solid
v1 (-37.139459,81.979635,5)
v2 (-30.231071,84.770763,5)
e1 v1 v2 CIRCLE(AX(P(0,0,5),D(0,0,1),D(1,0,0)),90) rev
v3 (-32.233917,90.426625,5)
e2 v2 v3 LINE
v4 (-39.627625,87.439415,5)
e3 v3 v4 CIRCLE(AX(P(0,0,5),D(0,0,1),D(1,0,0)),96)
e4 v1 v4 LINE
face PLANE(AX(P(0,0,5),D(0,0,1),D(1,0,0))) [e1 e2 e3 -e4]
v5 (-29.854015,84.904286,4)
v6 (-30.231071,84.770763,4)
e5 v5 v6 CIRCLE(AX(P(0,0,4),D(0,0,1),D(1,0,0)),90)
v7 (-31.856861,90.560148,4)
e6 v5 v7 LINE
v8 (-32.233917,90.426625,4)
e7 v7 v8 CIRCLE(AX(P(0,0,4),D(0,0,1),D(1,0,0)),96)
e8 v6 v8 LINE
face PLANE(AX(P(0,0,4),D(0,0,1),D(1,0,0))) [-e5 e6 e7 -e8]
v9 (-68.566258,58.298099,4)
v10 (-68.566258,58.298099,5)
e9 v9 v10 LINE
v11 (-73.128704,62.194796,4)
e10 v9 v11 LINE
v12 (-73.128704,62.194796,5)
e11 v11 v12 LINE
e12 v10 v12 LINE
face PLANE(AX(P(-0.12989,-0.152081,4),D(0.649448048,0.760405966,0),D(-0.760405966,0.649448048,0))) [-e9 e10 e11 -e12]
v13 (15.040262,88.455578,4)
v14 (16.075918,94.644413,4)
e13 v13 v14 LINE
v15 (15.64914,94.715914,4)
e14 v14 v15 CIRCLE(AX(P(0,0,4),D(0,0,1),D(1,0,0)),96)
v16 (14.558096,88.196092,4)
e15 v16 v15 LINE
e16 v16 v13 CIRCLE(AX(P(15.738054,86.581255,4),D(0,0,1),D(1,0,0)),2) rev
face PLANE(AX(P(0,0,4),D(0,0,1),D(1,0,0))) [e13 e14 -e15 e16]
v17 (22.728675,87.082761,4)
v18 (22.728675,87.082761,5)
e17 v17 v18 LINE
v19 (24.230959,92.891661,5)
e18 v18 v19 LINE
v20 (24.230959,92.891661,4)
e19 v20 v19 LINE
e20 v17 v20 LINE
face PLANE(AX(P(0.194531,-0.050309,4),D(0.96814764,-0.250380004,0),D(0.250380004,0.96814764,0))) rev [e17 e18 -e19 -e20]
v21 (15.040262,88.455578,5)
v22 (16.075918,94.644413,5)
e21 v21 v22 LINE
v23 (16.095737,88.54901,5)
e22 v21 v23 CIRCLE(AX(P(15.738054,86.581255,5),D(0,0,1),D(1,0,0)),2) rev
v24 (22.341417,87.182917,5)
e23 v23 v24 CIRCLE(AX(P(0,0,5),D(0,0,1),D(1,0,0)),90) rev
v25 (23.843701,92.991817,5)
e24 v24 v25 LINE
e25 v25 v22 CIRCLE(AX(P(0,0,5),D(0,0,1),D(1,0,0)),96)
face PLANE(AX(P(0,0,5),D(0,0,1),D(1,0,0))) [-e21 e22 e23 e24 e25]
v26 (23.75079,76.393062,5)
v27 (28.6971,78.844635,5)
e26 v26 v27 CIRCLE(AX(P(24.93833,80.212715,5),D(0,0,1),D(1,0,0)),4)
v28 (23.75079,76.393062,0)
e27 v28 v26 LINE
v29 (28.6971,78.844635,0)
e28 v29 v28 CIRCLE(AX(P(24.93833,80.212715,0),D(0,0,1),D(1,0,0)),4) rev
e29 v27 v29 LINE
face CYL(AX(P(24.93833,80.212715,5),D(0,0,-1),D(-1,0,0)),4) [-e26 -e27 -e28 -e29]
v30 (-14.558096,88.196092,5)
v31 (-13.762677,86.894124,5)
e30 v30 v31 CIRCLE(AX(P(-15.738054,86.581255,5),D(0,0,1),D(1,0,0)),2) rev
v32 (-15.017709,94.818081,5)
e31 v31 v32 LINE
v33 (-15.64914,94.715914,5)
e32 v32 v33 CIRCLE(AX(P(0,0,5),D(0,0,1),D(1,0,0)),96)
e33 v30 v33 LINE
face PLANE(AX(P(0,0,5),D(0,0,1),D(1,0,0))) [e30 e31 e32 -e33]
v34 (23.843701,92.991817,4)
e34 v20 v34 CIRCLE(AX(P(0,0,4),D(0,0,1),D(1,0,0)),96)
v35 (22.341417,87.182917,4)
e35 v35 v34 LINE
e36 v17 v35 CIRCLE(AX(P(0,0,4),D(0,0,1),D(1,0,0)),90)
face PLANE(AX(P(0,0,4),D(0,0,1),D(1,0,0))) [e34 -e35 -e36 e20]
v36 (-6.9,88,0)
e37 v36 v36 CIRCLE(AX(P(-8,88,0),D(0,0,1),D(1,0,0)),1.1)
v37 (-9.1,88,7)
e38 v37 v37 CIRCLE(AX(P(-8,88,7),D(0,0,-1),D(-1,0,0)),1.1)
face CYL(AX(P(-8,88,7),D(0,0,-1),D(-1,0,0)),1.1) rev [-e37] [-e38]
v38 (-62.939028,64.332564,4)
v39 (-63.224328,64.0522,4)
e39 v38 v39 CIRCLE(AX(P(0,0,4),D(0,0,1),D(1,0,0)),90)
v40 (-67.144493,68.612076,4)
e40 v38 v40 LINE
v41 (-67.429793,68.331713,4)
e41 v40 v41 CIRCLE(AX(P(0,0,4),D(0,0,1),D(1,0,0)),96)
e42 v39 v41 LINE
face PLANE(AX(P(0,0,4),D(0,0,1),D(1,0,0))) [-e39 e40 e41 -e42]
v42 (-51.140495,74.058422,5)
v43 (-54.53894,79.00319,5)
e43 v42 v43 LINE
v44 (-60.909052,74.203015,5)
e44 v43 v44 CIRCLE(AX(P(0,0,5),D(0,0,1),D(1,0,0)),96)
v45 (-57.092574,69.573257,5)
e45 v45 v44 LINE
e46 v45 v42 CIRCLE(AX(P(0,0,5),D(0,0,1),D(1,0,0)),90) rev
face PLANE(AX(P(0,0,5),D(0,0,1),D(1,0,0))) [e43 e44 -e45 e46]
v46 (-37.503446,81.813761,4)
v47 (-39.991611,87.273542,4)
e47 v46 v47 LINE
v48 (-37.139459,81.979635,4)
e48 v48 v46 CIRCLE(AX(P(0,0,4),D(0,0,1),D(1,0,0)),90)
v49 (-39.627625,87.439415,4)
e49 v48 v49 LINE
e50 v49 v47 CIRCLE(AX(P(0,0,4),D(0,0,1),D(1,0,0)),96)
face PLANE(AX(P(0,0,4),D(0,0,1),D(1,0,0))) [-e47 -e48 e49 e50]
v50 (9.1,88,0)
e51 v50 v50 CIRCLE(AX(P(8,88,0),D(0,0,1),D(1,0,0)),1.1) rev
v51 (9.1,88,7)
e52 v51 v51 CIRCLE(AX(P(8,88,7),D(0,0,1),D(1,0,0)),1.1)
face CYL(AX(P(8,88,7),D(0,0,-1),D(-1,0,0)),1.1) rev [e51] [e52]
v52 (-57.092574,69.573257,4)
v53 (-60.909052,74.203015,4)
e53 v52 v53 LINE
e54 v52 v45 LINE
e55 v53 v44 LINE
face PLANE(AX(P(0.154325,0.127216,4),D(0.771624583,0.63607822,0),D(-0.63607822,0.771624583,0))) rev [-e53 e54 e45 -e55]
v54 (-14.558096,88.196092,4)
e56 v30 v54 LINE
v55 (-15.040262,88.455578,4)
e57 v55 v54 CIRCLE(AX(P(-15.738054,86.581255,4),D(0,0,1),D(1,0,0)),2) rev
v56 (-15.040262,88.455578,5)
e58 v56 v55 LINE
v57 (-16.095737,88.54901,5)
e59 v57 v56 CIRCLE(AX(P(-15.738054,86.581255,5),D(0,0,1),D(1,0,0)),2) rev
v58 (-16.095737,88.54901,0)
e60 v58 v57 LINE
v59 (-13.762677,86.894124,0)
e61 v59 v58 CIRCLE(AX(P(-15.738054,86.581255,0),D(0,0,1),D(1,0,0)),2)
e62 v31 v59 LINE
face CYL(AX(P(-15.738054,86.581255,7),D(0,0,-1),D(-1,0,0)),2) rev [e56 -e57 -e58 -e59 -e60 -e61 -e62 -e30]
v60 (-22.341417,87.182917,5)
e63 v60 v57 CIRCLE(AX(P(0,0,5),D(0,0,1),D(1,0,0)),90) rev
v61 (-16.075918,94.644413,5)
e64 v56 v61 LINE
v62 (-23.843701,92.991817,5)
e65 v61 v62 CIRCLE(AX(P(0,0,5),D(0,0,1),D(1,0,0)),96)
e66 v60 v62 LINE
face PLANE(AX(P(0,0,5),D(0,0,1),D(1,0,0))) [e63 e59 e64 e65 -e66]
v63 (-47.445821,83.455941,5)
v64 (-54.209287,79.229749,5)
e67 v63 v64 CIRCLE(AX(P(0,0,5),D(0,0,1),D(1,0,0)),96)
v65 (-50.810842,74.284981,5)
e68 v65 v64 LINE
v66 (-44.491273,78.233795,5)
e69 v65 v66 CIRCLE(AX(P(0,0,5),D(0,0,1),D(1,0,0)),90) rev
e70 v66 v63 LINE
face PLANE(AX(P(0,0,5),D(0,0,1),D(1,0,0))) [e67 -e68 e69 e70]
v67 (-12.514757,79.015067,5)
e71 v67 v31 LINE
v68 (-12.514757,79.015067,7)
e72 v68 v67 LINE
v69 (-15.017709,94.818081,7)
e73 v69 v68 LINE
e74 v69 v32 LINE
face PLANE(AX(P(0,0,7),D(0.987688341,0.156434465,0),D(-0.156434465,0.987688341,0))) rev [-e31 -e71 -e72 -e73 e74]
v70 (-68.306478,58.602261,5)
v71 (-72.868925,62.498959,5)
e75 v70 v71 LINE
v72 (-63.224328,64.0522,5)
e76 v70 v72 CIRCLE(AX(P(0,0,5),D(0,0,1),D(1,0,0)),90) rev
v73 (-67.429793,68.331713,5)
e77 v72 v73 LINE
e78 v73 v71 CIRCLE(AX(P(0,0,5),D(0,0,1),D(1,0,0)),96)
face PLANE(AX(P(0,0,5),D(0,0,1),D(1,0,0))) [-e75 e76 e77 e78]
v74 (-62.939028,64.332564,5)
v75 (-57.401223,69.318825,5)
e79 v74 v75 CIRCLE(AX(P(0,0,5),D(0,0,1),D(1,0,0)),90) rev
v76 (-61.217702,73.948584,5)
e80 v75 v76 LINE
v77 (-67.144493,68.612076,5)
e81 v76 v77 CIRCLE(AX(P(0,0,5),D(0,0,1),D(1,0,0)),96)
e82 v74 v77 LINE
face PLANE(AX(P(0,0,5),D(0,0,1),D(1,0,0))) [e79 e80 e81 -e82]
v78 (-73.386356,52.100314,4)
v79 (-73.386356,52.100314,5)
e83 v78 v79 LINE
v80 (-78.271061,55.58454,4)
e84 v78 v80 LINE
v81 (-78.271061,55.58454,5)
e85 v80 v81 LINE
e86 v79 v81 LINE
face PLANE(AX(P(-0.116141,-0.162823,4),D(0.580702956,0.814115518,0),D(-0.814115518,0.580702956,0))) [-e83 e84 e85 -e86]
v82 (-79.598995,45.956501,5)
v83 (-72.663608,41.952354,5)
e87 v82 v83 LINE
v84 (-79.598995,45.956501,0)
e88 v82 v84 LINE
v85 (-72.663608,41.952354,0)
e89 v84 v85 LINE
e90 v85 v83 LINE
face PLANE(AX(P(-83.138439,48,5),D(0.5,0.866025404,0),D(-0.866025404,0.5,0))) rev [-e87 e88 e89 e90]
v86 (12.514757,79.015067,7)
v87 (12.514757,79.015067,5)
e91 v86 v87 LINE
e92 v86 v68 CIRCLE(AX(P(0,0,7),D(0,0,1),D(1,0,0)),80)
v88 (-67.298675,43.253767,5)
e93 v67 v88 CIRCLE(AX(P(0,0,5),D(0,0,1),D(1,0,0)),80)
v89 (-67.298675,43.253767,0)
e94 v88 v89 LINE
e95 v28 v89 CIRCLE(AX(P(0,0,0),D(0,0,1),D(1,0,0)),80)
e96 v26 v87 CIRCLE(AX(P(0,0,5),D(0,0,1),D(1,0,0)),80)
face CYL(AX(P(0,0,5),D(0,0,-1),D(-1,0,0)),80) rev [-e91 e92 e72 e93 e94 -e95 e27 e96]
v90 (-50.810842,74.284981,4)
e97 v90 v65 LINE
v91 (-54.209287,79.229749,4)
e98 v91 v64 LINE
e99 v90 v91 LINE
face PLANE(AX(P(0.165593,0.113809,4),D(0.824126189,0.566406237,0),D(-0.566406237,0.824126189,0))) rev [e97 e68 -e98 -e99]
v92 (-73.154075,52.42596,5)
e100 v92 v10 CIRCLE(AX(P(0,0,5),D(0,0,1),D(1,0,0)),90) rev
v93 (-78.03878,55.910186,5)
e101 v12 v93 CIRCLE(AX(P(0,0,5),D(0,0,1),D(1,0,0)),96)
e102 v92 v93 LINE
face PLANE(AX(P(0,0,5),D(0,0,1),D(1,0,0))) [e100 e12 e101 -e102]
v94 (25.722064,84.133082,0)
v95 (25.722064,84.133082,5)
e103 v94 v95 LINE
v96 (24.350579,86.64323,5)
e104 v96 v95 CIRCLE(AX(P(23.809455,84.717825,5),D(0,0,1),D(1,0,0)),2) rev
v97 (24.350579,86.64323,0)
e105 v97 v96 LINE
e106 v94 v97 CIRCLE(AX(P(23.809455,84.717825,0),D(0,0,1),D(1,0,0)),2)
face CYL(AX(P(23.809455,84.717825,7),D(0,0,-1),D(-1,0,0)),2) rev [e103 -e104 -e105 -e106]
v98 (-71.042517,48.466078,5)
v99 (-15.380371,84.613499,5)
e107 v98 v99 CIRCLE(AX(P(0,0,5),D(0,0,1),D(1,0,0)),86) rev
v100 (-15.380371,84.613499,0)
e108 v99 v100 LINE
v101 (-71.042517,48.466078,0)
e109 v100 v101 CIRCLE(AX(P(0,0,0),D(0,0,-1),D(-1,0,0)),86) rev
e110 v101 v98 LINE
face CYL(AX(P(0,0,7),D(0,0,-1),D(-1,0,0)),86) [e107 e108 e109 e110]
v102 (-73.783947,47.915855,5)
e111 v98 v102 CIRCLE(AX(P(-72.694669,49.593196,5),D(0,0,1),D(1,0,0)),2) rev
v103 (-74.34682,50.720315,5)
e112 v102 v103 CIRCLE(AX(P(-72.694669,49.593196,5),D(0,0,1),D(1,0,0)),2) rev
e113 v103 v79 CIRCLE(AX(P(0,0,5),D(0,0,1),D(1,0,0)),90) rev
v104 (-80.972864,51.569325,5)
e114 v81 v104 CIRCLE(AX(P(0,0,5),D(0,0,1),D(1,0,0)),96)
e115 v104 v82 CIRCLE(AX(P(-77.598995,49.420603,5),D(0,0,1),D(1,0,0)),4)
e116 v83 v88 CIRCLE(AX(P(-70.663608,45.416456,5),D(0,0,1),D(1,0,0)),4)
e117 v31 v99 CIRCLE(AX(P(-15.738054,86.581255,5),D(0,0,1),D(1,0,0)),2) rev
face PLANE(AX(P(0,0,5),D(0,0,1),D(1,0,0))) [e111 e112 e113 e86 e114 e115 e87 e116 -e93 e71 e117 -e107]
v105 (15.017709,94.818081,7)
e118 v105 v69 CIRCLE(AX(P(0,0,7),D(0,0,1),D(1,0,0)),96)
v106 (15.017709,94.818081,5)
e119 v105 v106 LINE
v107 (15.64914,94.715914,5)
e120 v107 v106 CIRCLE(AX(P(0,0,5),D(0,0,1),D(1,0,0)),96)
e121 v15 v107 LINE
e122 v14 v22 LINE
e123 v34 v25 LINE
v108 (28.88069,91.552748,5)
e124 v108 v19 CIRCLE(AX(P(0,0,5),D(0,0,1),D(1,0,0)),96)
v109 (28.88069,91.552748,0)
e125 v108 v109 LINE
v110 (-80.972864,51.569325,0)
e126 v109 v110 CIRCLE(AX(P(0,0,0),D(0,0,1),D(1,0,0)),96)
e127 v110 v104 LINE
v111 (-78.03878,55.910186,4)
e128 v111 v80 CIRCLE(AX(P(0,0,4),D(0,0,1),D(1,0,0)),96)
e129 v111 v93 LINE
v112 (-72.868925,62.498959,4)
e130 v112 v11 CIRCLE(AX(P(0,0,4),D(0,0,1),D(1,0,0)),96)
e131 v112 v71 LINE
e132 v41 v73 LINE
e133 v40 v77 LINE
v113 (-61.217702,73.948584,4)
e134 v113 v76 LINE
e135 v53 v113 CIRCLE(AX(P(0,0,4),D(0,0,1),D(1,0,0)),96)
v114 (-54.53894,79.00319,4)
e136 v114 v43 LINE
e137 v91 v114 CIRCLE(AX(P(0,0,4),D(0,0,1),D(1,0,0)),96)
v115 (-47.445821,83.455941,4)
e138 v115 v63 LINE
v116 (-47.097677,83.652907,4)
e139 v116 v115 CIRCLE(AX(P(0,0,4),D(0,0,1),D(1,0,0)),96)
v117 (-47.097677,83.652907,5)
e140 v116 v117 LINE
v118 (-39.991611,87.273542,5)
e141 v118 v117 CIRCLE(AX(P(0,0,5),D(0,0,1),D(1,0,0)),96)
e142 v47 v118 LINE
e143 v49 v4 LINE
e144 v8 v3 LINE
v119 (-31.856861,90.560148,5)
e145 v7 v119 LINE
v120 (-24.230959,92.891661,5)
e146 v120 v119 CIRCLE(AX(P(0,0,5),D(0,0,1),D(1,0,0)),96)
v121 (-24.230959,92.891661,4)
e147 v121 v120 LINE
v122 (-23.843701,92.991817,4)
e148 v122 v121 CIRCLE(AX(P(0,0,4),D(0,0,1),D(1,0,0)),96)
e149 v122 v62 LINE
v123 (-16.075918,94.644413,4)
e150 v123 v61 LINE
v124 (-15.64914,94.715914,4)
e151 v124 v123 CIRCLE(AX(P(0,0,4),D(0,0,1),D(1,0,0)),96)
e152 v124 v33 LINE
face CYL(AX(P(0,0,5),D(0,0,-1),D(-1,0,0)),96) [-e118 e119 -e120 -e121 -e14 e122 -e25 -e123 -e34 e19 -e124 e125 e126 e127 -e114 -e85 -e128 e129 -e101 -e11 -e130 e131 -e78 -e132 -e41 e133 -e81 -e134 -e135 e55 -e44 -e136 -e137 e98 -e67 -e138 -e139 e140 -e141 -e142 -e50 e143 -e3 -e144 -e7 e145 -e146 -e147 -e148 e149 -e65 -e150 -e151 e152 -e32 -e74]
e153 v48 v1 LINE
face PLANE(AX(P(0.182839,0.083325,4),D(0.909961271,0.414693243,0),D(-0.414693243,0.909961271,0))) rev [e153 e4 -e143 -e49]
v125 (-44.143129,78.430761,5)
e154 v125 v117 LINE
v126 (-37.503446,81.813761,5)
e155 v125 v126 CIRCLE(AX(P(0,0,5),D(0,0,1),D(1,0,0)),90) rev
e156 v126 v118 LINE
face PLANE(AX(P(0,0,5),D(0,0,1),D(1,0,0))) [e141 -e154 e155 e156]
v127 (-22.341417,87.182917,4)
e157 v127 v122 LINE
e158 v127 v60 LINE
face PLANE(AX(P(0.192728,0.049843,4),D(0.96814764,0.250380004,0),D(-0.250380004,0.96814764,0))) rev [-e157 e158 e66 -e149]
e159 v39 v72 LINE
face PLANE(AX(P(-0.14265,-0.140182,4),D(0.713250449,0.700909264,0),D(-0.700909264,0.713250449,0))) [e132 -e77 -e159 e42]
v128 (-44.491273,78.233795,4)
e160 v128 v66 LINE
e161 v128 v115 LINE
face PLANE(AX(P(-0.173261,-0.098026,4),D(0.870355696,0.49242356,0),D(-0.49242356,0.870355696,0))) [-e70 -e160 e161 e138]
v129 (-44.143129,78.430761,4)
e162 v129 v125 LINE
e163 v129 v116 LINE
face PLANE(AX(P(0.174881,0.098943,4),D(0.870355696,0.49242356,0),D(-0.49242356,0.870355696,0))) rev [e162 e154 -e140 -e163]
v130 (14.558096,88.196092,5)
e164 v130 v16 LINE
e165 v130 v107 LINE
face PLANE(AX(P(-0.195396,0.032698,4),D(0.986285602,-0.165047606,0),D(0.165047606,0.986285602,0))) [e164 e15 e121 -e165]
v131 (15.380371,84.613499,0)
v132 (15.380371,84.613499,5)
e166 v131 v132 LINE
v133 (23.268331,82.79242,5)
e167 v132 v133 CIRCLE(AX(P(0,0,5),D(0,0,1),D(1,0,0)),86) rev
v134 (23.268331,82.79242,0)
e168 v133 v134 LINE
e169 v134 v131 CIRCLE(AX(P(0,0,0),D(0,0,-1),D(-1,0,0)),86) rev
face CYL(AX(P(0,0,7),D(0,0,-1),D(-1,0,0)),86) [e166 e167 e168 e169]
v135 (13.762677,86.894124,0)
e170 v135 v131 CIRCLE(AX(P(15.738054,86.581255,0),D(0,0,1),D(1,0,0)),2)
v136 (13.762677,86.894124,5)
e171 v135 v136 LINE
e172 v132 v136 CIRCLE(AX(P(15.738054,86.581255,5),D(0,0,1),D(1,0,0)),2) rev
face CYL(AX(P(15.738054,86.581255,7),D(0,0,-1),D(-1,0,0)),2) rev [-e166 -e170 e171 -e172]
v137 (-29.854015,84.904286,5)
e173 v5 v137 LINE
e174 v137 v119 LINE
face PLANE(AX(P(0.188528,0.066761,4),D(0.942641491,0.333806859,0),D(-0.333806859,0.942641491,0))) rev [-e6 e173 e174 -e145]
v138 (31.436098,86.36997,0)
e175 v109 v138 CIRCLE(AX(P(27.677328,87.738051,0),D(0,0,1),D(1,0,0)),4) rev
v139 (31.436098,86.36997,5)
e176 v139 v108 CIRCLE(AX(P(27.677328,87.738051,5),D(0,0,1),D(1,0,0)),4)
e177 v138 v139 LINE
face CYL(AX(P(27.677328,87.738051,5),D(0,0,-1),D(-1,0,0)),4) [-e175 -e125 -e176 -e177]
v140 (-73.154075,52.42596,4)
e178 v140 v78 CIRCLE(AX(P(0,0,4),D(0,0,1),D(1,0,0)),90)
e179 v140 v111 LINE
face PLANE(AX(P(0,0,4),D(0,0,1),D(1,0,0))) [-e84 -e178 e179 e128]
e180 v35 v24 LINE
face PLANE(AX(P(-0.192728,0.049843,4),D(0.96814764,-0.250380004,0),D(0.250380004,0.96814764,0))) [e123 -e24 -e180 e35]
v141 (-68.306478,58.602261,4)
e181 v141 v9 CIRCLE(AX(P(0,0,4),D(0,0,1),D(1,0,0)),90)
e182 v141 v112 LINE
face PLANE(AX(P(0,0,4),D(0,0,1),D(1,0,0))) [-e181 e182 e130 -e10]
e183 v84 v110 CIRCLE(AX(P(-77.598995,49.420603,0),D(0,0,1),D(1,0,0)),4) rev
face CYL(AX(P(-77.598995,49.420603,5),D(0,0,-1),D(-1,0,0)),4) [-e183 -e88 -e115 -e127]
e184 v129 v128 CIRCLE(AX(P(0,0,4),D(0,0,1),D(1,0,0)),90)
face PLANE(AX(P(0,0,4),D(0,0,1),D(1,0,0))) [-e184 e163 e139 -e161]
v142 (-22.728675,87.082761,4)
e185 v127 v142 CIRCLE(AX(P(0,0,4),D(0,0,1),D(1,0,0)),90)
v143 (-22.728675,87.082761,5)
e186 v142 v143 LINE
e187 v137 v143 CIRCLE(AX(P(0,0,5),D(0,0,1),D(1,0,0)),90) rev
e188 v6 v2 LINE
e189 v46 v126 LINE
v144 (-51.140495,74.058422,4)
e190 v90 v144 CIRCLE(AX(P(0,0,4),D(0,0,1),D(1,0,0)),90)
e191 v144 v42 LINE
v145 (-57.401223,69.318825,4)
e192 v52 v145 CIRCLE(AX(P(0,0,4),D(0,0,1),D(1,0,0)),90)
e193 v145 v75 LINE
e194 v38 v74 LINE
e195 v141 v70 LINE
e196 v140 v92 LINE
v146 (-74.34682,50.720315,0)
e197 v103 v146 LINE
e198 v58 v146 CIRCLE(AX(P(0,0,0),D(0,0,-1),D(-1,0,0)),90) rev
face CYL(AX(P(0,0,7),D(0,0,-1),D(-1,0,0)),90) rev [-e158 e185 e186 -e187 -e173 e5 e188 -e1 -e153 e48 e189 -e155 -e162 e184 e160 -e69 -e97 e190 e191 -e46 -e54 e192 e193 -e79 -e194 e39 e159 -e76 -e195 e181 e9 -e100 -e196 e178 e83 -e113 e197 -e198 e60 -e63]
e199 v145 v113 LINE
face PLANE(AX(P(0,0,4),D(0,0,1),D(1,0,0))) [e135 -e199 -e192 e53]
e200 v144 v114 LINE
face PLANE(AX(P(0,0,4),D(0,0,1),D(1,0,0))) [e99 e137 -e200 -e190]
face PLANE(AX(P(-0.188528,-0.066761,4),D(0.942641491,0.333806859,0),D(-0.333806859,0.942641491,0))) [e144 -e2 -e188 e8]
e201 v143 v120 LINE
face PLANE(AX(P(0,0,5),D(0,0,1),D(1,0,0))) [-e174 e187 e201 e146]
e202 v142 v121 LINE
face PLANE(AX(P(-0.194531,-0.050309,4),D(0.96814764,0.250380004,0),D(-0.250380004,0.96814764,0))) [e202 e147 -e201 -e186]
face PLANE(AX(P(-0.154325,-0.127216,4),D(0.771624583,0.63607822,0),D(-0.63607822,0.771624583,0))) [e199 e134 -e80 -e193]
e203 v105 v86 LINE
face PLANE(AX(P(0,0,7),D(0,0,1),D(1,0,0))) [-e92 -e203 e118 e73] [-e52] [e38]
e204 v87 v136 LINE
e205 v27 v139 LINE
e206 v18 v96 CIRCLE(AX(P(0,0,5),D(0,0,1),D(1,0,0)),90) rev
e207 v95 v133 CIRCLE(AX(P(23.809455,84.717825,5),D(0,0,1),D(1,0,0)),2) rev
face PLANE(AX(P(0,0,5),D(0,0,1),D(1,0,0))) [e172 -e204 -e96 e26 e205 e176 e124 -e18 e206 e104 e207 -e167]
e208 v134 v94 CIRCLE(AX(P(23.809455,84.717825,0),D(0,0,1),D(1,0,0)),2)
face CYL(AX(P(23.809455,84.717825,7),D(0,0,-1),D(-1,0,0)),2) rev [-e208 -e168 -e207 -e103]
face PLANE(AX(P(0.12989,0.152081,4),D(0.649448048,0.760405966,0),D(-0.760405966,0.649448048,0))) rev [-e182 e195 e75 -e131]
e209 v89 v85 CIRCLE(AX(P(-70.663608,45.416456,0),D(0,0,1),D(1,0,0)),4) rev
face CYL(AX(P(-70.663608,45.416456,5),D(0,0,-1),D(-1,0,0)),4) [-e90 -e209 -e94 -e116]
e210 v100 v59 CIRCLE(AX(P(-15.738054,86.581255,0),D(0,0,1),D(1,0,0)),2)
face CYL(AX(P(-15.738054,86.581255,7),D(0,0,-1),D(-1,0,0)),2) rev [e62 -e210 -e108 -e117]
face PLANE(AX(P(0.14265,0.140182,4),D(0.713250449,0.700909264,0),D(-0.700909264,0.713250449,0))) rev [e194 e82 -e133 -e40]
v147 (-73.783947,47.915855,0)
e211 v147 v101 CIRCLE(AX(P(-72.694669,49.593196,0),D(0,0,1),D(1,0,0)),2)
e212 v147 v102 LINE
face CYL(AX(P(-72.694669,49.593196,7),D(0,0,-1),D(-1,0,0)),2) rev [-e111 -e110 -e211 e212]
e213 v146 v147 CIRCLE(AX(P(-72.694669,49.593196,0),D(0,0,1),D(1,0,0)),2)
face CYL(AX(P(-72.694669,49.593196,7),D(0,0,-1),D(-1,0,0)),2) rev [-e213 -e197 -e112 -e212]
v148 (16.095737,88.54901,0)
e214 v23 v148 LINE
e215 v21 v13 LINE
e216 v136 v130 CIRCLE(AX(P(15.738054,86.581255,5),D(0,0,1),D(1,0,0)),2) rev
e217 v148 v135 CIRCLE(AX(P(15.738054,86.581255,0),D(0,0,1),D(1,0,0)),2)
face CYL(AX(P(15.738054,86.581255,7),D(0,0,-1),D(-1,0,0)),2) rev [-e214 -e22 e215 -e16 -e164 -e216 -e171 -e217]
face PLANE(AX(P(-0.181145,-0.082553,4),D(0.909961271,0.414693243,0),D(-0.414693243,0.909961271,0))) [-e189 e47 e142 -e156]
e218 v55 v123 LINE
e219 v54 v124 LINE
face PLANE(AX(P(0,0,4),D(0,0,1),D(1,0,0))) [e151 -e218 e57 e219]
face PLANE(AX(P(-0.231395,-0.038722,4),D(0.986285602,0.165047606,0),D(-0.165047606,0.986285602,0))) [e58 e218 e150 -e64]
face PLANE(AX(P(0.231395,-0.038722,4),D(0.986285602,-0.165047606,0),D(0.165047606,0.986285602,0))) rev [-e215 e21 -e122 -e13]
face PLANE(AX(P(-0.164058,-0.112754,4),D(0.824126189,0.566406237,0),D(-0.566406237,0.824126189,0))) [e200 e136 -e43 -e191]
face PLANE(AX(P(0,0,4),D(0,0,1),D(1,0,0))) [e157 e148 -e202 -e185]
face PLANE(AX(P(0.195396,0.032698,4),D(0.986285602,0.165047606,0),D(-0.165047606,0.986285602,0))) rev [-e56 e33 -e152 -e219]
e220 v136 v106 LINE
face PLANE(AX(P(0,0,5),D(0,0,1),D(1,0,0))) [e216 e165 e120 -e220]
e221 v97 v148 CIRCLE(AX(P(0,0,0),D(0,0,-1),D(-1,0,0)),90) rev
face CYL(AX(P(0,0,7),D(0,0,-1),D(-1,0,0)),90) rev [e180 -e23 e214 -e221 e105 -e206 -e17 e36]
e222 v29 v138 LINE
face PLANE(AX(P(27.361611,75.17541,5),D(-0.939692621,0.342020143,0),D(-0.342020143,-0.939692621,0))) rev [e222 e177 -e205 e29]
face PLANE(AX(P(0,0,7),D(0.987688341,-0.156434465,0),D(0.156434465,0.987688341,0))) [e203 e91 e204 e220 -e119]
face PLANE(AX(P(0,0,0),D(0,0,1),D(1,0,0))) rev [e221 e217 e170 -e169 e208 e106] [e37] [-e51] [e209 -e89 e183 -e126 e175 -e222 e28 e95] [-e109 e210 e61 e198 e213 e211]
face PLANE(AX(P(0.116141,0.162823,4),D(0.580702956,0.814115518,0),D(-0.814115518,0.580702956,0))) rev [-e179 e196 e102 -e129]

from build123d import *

# Parameters (mm, degrees)
BOSS_EXTRUDE1_DEPTH = 5
SKETCH1_3_R         = 1.1000000000006245
SKETCH1_3_R_2       = 1.1000000000006236
BOSS_EXTRUDE2_DEPTH = 7
SKETCH1_6_R         = 1.1000000000006236
SKETCH1_6_R_2       = 1.1000000000006245
CUT_EXTRUDE3_DEPTH  = 5
FILLET1_R           = 4
FILLET2_R           = 2
CUT_EXTRUDE8_START  = 4
CUT_EXTRUDE8_DEPTH  = 1


with BuildPart() as part:
    # Sketch1 → Boss-Extrude1 (new body)
    with BuildSketch(Plane.XY):
        with BuildLine():
            Line((-83.13843876330769, 48.0000000000023), (-69.28203230275663, 40.00000000000234))
            ThreePointArc((-69.28203230275663, 40.00000000000234), (-27.361611466054974, 75.17540966287518), (27.361611466052146, 75.17540966287518))
            Line((27.361611466052146, 75.17540966287518), (32.833933759262855, 90.21049159544972))
            ThreePointArc((32.833933759262855, 90.21049159544972), (-32.83393375926571, 90.21049159544971), (-83.13843876330769, 48.0000000000023))
        make_face()
    extrude(amount=BOSS_EXTRUDE1_DEPTH)

    # Sketch1<3> → Boss-Extrude2 (add)
    with BuildSketch(Plane.XY):
        with BuildLine():
            Line((-13.453363993461283, 84.94119729118435), (-12.514757203219895, 79.01506724761352))
            ThreePointArc((-12.514757203219894, 79.01506724761353), (-1.39977e-12, 80.00000000000253), (12.514757203217084, 79.01506724761356))
            Line((12.514757203217078, 79.01506724761352), (13.453363993458465, 84.94119729118435))
            Line((13.453363993458465, 84.94119729118435), (14.079101853619393, 88.89195065356492))
            Line((14.079101853619393, 88.89195065356492), (15.017708643860779, 94.81808069713574))
            ThreePointArc((15.017708643860784, 94.81808069713577), (-1.40067e-12, 96.00000000000256), (-15.017708643863598, 94.81808069713577))
            Line((-15.017708643863596, 94.81808069713574), (-14.07910185362221, 88.89195065356492))
            Line((-14.07910185362221, 88.89195065356492), (-13.453363993461283, 84.94119729118435))
        make_face()
        with Locations(Location((-8.000000000001409, 88.00000000000252, 0), (0, 0, 180))):
            Circle(SKETCH1_3_R, mode=Mode.SUBTRACT)
        with Locations((7.999999999998591, 88.00000000000252)):
            Circle(SKETCH1_3_R_2, mode=Mode.SUBTRACT)
    extrude(amount=BOSS_EXTRUDE2_DEPTH)

    # Sketch1<6> → Cut-Extrude3 (cut)
    with BuildSketch(Plane.XY):
        with BuildLine():
            Line((-75.48035111508972, 49.01751315135477), (-72.125668843308, 46.83895701129465))
            ThreePointArc((-72.12566884330799, 46.83895701129467), (-46.83895701129383, 72.12566884330892), (-13.453363993461279, 84.94119729118435))
            Line((-13.453363993461283, 84.94119729118435), (-14.07910185362221, 88.89195065356492))
            ThreePointArc((-14.079101853622205, 88.89195065356492), (-49.01751315135395, 75.4803511150906), (-75.48035111508973, 49.01751315135477))
        make_face()
        with BuildLine():
            Line((14.079101853619393, 88.89195065356492), (13.453363993458465, 84.94119729118435))
            ThreePointArc((13.453363993458456, 84.94119729118435), (19.345790673570992, 83.79582557153273), (25.14396660615395, 82.24220901282357))
            Line((25.143966606153956, 82.24220901282357), (26.31345342504491, 86.06742803667572))
            ThreePointArc((26.31345342504492, 86.06742803667575), (20.245594890946464, 87.69330583067372), (14.079101853619395, 88.89195065356492))
        make_face()
        with Locations((7.999999999998591, 88.00000000000252)):
            Circle(SKETCH1_6_R)
        with Locations(Location((-8.000000000001409, 88.00000000000252, 0), (0, 0, 180))):
            Circle(SKETCH1_6_R_2)
    extrude(amount=CUT_EXTRUDE3_DEPTH, mode=Mode.SUBTRACT)

    # Fillet1
    fillet1_edges = [part.edges().sort_by_distance(p)[0] for p in [
        (27.361611466052143, 75.17540966287518, 2.5),
        (-69.28203230275663, 40.000000000002345, 2.5),
        (-83.1384387633077, 48.0000000000023, 2.5),
        (32.83393375926286, 90.21049159544972, 2.5),
    ]]
    fillet(fillet1_edges, radius=FILLET1_R)

    # Fillet2
    fillet2_edges = [part.edges().sort_by_distance(p)[0] for p in [
        (13.45336399345846, 84.94119729118435, 2.5),
        (14.079101853619393, 88.89195065356492, 2.5),
        (-13.45336399346129, 84.94119729118435, 2.5),
        (-14.079101853622209, 88.89195065356492, 2.5),
        (-72.125668843308, 46.83895701129467, 2.5),
        (-75.48035111508975, 49.01751315135476, 2.5),
        (26.313453425044912, 86.06742803667574, 2.5),
        (25.143966606153953, 82.24220901282357, 2.5),
    ]]
    fillet(fillet2_edges, radius=FILLET2_R - 0.0001)  # a hair under: the kernel refuses the full size

    # Sketch1<11> → Cut-Extrude8 (cut)
    with BuildSketch(Plane.XY.offset(CUT_EXTRUDE8_START)):
        with BuildLine():
            ThreePointArc((-60.90905171355247, 74.20301489398085), (-61.063509146668466, 74.07596000522229), (-61.21770154690506, 73.9485836058718))
            Line((-61.21770154690517, 73.9485836058717), (-57.40122339078805, 69.31882538850002))
            ThreePointArc((-57.40122339078971, 69.31882538849865), (-57.247039825001984, 69.44621250489581), (-57.092573557434, 69.5732566766103))
            Line((-57.09257355743297, 69.57325667661115), (-60.909051713550085, 74.20301489398283))
        make_face()
        with BuildLine():
            ThreePointArc((-67.14449326003556, 68.61207637765807), (-67.28728937278758, 68.47204311880354), (-67.42979343969591, 68.33171267193941))
            Line((-67.42979343969681, 68.33171267193853), (-63.22432811901289, 64.05220007072279))
            ThreePointArc((-63.22432811901119, 64.05220007072444), (-63.081833786988334, 64.19254042387854), (-62.939027939352314, 64.33256377644165))
            Line((-62.93902793935119, 64.33256377644273), (-67.14449326003512, 68.61207637765848))
        make_face()
        with BuildLine():
            ThreePointArc((-72.86892466985591, 62.49895853099788), (-72.9989726976045, 62.34701263970007), (-73.12870388919032, 62.19479614475513))
            Line((-73.12870388918984, 62.19479614475569), (-68.5662575343589, 58.298098834631475))
            ThreePointArc((-68.56625753435887, 58.298098834631524), (-68.43653690400481, 58.45032434971835), (-68.30647831502658, 58.60226122087179))
            Line((-68.30647831502684, 58.60226122087151), (-72.86892466985778, 62.498958530995715))
        make_face()
        with BuildLine():
            Line((16.639553027860302, 100.6343880514797), (14.331087155641026, 86.8395399557962))
            ThreePointArc((14.331087155641026, 86.8395399557962), (14.54451947105813, 86.80404778668378), (14.757863892002872, 86.76803104912538))
            Line((14.757863892002872, 86.76803104912538), (17.066344573354787, 100.56296764072263))
            Line((17.066344573354787, 100.56296764072263), (16.639553027860302, 100.6343880514797))
        make_face()
        with BuildLine():
            Line((25.73337251273005, 98.70106424012083), (22.231449806724747, 85.16013385550725))
            ThreePointArc((22.231449806724747, 85.16013385550725), (22.037877706171837, 85.21043190246515), (21.844191809986345, 85.26028995356089))
            Line((21.844191809986345, 85.26028995356089), (25.34611345657903, 98.80121624174181))
            Line((25.34611345657903, 98.80121624174181), (25.73337251273005, 98.70106424012083))
        make_face()
        with BuildLine():
            Line((42.116005821693015, 92.89966951845646), (36.3159273051723, 80.17255878891613))
            ThreePointArc((36.3159273051723, 80.17255878891613), (36.49801466794809, 80.08982884296243), (36.67991356817236, 80.00668534208985))
            Line((36.67991356817236, 80.00668534208985), (42.47999033003967, 92.733792221395))
            Line((42.47999033003967, 92.733792221395), (42.116005821693015, 92.89966951845646))
        make_face()
        with BuildLine():
            Line((-16.639553027863123, 100.6343880514797), (-14.331087155646365, 86.83953995579603))
            ThreePointArc((-14.331087155646365, 86.83953995579603), (-14.544519471062088, 86.80404778668402), (-14.757863892005375, 86.76803104912547))
            Line((-14.757863892005375, 86.76803104912547), (-17.066344573355888, 100.56296764072306))
            Line((-17.066344573355888, 100.56296764072306), (-16.639553027863123, 100.6343880514797))
        make_face()
        with BuildLine():
            Line((-25.346113456581847, 98.80121624174181), (-21.8441918099951, 85.26028995355922))
            ThreePointArc((-21.8441918099951, 85.26028995355922), (-22.03787770624786, 85.21043190244556), (-22.231449806868046, 85.16013385546994))
            Line((-22.231449806868046, 85.16013385546994), (-25.733372512730377, 98.70106424012063))
            Line((-25.733372512730377, 98.70106424012063), (-25.346113456581847, 98.80121624174181))
        make_face()
        with BuildLine():
            Line((-34.251374684060885, 96.12374945737389), (-29.568170243810847, 82.89878809264937))
            ThreePointArc((-29.568170243810847, 82.89878809264937), (-29.379717798712498, 82.96576366709935), (-29.191113647373975, 83.03231083634289))
            Line((-29.191113647373975, 83.03231083634289), (-33.87431808762401, 96.25727220106741))
            Line((-33.87431808762401, 96.25727220106741), (-34.251374684060885, 96.12374945737389))
        make_face()
        with BuildLine():
            Line((-42.47999033004247, 92.73379222139498), (-36.67991356817387, 80.00668534209034))
            ThreePointArc((-36.67991356817387, 80.00668534209034), (-36.49801466794875, 80.0898288429634), (-36.31592730517207, 80.1725587889175))
            Line((-36.31592730517207, 80.1725587889175), (-42.11600582169416, 92.89966951845659))
            Line((-42.11600582169416, 92.89966951845659), (-42.47999033004247, 92.73379222139498))
        make_face()
        with BuildLine():
            Line((-50.40062368063963, 88.67853703576704), (-43.51337750884637, 76.50537063873087))
            ThreePointArc((-43.51337750884637, 76.50537063873087), (-43.33941722242662, 76.6040512872355), (-43.16523314692608, 76.70233638011615))
            Line((-43.16523314692608, 76.70233638011615), (-50.052481402265904, 88.87550645980734))
            Line((-50.052481402265904, 88.87550645980734), (-50.40062368063963, 88.67853703576704))
        make_face()
        with BuildLine():
            Line((-57.937677852298485, 83.94838463773227), (-50.01567837258084, 72.42180386960484))
            ThreePointArc((-50.01567837258084, 72.42180386960484), (-49.850980642786205, 72.53527064642093), (-49.68602550055159, 72.64836287732517))
            Line((-49.68602550055159, 72.64836287732517), (-57.6080273768518, 84.17494713250092))
            Line((-57.6080273768518, 84.17494713250092), (-57.937677852298485, 83.94838463773227))
        make_face()
        with BuildLine():
            Line((-82.9591200723337, 59.41983064866502), (-71.53733737082064, 51.27275222465001))
            ThreePointArc((-71.53733737082064, 51.27275222465001), (-71.653662958767, 51.11006107791678), (-71.769618553105, 50.94710601730748))
            Line((-71.769618553105, 50.94710601730748), (-83.19140125461807, 59.09418444132249))
            Line((-83.19140125461807, 59.09418444132249), (-82.9591200723337, 59.41983064866502))
        make_face()
    extrude(amount=CUT_EXTRUDE8_DEPTH, mode=Mode.SUBTRACT)


solid = part.part
